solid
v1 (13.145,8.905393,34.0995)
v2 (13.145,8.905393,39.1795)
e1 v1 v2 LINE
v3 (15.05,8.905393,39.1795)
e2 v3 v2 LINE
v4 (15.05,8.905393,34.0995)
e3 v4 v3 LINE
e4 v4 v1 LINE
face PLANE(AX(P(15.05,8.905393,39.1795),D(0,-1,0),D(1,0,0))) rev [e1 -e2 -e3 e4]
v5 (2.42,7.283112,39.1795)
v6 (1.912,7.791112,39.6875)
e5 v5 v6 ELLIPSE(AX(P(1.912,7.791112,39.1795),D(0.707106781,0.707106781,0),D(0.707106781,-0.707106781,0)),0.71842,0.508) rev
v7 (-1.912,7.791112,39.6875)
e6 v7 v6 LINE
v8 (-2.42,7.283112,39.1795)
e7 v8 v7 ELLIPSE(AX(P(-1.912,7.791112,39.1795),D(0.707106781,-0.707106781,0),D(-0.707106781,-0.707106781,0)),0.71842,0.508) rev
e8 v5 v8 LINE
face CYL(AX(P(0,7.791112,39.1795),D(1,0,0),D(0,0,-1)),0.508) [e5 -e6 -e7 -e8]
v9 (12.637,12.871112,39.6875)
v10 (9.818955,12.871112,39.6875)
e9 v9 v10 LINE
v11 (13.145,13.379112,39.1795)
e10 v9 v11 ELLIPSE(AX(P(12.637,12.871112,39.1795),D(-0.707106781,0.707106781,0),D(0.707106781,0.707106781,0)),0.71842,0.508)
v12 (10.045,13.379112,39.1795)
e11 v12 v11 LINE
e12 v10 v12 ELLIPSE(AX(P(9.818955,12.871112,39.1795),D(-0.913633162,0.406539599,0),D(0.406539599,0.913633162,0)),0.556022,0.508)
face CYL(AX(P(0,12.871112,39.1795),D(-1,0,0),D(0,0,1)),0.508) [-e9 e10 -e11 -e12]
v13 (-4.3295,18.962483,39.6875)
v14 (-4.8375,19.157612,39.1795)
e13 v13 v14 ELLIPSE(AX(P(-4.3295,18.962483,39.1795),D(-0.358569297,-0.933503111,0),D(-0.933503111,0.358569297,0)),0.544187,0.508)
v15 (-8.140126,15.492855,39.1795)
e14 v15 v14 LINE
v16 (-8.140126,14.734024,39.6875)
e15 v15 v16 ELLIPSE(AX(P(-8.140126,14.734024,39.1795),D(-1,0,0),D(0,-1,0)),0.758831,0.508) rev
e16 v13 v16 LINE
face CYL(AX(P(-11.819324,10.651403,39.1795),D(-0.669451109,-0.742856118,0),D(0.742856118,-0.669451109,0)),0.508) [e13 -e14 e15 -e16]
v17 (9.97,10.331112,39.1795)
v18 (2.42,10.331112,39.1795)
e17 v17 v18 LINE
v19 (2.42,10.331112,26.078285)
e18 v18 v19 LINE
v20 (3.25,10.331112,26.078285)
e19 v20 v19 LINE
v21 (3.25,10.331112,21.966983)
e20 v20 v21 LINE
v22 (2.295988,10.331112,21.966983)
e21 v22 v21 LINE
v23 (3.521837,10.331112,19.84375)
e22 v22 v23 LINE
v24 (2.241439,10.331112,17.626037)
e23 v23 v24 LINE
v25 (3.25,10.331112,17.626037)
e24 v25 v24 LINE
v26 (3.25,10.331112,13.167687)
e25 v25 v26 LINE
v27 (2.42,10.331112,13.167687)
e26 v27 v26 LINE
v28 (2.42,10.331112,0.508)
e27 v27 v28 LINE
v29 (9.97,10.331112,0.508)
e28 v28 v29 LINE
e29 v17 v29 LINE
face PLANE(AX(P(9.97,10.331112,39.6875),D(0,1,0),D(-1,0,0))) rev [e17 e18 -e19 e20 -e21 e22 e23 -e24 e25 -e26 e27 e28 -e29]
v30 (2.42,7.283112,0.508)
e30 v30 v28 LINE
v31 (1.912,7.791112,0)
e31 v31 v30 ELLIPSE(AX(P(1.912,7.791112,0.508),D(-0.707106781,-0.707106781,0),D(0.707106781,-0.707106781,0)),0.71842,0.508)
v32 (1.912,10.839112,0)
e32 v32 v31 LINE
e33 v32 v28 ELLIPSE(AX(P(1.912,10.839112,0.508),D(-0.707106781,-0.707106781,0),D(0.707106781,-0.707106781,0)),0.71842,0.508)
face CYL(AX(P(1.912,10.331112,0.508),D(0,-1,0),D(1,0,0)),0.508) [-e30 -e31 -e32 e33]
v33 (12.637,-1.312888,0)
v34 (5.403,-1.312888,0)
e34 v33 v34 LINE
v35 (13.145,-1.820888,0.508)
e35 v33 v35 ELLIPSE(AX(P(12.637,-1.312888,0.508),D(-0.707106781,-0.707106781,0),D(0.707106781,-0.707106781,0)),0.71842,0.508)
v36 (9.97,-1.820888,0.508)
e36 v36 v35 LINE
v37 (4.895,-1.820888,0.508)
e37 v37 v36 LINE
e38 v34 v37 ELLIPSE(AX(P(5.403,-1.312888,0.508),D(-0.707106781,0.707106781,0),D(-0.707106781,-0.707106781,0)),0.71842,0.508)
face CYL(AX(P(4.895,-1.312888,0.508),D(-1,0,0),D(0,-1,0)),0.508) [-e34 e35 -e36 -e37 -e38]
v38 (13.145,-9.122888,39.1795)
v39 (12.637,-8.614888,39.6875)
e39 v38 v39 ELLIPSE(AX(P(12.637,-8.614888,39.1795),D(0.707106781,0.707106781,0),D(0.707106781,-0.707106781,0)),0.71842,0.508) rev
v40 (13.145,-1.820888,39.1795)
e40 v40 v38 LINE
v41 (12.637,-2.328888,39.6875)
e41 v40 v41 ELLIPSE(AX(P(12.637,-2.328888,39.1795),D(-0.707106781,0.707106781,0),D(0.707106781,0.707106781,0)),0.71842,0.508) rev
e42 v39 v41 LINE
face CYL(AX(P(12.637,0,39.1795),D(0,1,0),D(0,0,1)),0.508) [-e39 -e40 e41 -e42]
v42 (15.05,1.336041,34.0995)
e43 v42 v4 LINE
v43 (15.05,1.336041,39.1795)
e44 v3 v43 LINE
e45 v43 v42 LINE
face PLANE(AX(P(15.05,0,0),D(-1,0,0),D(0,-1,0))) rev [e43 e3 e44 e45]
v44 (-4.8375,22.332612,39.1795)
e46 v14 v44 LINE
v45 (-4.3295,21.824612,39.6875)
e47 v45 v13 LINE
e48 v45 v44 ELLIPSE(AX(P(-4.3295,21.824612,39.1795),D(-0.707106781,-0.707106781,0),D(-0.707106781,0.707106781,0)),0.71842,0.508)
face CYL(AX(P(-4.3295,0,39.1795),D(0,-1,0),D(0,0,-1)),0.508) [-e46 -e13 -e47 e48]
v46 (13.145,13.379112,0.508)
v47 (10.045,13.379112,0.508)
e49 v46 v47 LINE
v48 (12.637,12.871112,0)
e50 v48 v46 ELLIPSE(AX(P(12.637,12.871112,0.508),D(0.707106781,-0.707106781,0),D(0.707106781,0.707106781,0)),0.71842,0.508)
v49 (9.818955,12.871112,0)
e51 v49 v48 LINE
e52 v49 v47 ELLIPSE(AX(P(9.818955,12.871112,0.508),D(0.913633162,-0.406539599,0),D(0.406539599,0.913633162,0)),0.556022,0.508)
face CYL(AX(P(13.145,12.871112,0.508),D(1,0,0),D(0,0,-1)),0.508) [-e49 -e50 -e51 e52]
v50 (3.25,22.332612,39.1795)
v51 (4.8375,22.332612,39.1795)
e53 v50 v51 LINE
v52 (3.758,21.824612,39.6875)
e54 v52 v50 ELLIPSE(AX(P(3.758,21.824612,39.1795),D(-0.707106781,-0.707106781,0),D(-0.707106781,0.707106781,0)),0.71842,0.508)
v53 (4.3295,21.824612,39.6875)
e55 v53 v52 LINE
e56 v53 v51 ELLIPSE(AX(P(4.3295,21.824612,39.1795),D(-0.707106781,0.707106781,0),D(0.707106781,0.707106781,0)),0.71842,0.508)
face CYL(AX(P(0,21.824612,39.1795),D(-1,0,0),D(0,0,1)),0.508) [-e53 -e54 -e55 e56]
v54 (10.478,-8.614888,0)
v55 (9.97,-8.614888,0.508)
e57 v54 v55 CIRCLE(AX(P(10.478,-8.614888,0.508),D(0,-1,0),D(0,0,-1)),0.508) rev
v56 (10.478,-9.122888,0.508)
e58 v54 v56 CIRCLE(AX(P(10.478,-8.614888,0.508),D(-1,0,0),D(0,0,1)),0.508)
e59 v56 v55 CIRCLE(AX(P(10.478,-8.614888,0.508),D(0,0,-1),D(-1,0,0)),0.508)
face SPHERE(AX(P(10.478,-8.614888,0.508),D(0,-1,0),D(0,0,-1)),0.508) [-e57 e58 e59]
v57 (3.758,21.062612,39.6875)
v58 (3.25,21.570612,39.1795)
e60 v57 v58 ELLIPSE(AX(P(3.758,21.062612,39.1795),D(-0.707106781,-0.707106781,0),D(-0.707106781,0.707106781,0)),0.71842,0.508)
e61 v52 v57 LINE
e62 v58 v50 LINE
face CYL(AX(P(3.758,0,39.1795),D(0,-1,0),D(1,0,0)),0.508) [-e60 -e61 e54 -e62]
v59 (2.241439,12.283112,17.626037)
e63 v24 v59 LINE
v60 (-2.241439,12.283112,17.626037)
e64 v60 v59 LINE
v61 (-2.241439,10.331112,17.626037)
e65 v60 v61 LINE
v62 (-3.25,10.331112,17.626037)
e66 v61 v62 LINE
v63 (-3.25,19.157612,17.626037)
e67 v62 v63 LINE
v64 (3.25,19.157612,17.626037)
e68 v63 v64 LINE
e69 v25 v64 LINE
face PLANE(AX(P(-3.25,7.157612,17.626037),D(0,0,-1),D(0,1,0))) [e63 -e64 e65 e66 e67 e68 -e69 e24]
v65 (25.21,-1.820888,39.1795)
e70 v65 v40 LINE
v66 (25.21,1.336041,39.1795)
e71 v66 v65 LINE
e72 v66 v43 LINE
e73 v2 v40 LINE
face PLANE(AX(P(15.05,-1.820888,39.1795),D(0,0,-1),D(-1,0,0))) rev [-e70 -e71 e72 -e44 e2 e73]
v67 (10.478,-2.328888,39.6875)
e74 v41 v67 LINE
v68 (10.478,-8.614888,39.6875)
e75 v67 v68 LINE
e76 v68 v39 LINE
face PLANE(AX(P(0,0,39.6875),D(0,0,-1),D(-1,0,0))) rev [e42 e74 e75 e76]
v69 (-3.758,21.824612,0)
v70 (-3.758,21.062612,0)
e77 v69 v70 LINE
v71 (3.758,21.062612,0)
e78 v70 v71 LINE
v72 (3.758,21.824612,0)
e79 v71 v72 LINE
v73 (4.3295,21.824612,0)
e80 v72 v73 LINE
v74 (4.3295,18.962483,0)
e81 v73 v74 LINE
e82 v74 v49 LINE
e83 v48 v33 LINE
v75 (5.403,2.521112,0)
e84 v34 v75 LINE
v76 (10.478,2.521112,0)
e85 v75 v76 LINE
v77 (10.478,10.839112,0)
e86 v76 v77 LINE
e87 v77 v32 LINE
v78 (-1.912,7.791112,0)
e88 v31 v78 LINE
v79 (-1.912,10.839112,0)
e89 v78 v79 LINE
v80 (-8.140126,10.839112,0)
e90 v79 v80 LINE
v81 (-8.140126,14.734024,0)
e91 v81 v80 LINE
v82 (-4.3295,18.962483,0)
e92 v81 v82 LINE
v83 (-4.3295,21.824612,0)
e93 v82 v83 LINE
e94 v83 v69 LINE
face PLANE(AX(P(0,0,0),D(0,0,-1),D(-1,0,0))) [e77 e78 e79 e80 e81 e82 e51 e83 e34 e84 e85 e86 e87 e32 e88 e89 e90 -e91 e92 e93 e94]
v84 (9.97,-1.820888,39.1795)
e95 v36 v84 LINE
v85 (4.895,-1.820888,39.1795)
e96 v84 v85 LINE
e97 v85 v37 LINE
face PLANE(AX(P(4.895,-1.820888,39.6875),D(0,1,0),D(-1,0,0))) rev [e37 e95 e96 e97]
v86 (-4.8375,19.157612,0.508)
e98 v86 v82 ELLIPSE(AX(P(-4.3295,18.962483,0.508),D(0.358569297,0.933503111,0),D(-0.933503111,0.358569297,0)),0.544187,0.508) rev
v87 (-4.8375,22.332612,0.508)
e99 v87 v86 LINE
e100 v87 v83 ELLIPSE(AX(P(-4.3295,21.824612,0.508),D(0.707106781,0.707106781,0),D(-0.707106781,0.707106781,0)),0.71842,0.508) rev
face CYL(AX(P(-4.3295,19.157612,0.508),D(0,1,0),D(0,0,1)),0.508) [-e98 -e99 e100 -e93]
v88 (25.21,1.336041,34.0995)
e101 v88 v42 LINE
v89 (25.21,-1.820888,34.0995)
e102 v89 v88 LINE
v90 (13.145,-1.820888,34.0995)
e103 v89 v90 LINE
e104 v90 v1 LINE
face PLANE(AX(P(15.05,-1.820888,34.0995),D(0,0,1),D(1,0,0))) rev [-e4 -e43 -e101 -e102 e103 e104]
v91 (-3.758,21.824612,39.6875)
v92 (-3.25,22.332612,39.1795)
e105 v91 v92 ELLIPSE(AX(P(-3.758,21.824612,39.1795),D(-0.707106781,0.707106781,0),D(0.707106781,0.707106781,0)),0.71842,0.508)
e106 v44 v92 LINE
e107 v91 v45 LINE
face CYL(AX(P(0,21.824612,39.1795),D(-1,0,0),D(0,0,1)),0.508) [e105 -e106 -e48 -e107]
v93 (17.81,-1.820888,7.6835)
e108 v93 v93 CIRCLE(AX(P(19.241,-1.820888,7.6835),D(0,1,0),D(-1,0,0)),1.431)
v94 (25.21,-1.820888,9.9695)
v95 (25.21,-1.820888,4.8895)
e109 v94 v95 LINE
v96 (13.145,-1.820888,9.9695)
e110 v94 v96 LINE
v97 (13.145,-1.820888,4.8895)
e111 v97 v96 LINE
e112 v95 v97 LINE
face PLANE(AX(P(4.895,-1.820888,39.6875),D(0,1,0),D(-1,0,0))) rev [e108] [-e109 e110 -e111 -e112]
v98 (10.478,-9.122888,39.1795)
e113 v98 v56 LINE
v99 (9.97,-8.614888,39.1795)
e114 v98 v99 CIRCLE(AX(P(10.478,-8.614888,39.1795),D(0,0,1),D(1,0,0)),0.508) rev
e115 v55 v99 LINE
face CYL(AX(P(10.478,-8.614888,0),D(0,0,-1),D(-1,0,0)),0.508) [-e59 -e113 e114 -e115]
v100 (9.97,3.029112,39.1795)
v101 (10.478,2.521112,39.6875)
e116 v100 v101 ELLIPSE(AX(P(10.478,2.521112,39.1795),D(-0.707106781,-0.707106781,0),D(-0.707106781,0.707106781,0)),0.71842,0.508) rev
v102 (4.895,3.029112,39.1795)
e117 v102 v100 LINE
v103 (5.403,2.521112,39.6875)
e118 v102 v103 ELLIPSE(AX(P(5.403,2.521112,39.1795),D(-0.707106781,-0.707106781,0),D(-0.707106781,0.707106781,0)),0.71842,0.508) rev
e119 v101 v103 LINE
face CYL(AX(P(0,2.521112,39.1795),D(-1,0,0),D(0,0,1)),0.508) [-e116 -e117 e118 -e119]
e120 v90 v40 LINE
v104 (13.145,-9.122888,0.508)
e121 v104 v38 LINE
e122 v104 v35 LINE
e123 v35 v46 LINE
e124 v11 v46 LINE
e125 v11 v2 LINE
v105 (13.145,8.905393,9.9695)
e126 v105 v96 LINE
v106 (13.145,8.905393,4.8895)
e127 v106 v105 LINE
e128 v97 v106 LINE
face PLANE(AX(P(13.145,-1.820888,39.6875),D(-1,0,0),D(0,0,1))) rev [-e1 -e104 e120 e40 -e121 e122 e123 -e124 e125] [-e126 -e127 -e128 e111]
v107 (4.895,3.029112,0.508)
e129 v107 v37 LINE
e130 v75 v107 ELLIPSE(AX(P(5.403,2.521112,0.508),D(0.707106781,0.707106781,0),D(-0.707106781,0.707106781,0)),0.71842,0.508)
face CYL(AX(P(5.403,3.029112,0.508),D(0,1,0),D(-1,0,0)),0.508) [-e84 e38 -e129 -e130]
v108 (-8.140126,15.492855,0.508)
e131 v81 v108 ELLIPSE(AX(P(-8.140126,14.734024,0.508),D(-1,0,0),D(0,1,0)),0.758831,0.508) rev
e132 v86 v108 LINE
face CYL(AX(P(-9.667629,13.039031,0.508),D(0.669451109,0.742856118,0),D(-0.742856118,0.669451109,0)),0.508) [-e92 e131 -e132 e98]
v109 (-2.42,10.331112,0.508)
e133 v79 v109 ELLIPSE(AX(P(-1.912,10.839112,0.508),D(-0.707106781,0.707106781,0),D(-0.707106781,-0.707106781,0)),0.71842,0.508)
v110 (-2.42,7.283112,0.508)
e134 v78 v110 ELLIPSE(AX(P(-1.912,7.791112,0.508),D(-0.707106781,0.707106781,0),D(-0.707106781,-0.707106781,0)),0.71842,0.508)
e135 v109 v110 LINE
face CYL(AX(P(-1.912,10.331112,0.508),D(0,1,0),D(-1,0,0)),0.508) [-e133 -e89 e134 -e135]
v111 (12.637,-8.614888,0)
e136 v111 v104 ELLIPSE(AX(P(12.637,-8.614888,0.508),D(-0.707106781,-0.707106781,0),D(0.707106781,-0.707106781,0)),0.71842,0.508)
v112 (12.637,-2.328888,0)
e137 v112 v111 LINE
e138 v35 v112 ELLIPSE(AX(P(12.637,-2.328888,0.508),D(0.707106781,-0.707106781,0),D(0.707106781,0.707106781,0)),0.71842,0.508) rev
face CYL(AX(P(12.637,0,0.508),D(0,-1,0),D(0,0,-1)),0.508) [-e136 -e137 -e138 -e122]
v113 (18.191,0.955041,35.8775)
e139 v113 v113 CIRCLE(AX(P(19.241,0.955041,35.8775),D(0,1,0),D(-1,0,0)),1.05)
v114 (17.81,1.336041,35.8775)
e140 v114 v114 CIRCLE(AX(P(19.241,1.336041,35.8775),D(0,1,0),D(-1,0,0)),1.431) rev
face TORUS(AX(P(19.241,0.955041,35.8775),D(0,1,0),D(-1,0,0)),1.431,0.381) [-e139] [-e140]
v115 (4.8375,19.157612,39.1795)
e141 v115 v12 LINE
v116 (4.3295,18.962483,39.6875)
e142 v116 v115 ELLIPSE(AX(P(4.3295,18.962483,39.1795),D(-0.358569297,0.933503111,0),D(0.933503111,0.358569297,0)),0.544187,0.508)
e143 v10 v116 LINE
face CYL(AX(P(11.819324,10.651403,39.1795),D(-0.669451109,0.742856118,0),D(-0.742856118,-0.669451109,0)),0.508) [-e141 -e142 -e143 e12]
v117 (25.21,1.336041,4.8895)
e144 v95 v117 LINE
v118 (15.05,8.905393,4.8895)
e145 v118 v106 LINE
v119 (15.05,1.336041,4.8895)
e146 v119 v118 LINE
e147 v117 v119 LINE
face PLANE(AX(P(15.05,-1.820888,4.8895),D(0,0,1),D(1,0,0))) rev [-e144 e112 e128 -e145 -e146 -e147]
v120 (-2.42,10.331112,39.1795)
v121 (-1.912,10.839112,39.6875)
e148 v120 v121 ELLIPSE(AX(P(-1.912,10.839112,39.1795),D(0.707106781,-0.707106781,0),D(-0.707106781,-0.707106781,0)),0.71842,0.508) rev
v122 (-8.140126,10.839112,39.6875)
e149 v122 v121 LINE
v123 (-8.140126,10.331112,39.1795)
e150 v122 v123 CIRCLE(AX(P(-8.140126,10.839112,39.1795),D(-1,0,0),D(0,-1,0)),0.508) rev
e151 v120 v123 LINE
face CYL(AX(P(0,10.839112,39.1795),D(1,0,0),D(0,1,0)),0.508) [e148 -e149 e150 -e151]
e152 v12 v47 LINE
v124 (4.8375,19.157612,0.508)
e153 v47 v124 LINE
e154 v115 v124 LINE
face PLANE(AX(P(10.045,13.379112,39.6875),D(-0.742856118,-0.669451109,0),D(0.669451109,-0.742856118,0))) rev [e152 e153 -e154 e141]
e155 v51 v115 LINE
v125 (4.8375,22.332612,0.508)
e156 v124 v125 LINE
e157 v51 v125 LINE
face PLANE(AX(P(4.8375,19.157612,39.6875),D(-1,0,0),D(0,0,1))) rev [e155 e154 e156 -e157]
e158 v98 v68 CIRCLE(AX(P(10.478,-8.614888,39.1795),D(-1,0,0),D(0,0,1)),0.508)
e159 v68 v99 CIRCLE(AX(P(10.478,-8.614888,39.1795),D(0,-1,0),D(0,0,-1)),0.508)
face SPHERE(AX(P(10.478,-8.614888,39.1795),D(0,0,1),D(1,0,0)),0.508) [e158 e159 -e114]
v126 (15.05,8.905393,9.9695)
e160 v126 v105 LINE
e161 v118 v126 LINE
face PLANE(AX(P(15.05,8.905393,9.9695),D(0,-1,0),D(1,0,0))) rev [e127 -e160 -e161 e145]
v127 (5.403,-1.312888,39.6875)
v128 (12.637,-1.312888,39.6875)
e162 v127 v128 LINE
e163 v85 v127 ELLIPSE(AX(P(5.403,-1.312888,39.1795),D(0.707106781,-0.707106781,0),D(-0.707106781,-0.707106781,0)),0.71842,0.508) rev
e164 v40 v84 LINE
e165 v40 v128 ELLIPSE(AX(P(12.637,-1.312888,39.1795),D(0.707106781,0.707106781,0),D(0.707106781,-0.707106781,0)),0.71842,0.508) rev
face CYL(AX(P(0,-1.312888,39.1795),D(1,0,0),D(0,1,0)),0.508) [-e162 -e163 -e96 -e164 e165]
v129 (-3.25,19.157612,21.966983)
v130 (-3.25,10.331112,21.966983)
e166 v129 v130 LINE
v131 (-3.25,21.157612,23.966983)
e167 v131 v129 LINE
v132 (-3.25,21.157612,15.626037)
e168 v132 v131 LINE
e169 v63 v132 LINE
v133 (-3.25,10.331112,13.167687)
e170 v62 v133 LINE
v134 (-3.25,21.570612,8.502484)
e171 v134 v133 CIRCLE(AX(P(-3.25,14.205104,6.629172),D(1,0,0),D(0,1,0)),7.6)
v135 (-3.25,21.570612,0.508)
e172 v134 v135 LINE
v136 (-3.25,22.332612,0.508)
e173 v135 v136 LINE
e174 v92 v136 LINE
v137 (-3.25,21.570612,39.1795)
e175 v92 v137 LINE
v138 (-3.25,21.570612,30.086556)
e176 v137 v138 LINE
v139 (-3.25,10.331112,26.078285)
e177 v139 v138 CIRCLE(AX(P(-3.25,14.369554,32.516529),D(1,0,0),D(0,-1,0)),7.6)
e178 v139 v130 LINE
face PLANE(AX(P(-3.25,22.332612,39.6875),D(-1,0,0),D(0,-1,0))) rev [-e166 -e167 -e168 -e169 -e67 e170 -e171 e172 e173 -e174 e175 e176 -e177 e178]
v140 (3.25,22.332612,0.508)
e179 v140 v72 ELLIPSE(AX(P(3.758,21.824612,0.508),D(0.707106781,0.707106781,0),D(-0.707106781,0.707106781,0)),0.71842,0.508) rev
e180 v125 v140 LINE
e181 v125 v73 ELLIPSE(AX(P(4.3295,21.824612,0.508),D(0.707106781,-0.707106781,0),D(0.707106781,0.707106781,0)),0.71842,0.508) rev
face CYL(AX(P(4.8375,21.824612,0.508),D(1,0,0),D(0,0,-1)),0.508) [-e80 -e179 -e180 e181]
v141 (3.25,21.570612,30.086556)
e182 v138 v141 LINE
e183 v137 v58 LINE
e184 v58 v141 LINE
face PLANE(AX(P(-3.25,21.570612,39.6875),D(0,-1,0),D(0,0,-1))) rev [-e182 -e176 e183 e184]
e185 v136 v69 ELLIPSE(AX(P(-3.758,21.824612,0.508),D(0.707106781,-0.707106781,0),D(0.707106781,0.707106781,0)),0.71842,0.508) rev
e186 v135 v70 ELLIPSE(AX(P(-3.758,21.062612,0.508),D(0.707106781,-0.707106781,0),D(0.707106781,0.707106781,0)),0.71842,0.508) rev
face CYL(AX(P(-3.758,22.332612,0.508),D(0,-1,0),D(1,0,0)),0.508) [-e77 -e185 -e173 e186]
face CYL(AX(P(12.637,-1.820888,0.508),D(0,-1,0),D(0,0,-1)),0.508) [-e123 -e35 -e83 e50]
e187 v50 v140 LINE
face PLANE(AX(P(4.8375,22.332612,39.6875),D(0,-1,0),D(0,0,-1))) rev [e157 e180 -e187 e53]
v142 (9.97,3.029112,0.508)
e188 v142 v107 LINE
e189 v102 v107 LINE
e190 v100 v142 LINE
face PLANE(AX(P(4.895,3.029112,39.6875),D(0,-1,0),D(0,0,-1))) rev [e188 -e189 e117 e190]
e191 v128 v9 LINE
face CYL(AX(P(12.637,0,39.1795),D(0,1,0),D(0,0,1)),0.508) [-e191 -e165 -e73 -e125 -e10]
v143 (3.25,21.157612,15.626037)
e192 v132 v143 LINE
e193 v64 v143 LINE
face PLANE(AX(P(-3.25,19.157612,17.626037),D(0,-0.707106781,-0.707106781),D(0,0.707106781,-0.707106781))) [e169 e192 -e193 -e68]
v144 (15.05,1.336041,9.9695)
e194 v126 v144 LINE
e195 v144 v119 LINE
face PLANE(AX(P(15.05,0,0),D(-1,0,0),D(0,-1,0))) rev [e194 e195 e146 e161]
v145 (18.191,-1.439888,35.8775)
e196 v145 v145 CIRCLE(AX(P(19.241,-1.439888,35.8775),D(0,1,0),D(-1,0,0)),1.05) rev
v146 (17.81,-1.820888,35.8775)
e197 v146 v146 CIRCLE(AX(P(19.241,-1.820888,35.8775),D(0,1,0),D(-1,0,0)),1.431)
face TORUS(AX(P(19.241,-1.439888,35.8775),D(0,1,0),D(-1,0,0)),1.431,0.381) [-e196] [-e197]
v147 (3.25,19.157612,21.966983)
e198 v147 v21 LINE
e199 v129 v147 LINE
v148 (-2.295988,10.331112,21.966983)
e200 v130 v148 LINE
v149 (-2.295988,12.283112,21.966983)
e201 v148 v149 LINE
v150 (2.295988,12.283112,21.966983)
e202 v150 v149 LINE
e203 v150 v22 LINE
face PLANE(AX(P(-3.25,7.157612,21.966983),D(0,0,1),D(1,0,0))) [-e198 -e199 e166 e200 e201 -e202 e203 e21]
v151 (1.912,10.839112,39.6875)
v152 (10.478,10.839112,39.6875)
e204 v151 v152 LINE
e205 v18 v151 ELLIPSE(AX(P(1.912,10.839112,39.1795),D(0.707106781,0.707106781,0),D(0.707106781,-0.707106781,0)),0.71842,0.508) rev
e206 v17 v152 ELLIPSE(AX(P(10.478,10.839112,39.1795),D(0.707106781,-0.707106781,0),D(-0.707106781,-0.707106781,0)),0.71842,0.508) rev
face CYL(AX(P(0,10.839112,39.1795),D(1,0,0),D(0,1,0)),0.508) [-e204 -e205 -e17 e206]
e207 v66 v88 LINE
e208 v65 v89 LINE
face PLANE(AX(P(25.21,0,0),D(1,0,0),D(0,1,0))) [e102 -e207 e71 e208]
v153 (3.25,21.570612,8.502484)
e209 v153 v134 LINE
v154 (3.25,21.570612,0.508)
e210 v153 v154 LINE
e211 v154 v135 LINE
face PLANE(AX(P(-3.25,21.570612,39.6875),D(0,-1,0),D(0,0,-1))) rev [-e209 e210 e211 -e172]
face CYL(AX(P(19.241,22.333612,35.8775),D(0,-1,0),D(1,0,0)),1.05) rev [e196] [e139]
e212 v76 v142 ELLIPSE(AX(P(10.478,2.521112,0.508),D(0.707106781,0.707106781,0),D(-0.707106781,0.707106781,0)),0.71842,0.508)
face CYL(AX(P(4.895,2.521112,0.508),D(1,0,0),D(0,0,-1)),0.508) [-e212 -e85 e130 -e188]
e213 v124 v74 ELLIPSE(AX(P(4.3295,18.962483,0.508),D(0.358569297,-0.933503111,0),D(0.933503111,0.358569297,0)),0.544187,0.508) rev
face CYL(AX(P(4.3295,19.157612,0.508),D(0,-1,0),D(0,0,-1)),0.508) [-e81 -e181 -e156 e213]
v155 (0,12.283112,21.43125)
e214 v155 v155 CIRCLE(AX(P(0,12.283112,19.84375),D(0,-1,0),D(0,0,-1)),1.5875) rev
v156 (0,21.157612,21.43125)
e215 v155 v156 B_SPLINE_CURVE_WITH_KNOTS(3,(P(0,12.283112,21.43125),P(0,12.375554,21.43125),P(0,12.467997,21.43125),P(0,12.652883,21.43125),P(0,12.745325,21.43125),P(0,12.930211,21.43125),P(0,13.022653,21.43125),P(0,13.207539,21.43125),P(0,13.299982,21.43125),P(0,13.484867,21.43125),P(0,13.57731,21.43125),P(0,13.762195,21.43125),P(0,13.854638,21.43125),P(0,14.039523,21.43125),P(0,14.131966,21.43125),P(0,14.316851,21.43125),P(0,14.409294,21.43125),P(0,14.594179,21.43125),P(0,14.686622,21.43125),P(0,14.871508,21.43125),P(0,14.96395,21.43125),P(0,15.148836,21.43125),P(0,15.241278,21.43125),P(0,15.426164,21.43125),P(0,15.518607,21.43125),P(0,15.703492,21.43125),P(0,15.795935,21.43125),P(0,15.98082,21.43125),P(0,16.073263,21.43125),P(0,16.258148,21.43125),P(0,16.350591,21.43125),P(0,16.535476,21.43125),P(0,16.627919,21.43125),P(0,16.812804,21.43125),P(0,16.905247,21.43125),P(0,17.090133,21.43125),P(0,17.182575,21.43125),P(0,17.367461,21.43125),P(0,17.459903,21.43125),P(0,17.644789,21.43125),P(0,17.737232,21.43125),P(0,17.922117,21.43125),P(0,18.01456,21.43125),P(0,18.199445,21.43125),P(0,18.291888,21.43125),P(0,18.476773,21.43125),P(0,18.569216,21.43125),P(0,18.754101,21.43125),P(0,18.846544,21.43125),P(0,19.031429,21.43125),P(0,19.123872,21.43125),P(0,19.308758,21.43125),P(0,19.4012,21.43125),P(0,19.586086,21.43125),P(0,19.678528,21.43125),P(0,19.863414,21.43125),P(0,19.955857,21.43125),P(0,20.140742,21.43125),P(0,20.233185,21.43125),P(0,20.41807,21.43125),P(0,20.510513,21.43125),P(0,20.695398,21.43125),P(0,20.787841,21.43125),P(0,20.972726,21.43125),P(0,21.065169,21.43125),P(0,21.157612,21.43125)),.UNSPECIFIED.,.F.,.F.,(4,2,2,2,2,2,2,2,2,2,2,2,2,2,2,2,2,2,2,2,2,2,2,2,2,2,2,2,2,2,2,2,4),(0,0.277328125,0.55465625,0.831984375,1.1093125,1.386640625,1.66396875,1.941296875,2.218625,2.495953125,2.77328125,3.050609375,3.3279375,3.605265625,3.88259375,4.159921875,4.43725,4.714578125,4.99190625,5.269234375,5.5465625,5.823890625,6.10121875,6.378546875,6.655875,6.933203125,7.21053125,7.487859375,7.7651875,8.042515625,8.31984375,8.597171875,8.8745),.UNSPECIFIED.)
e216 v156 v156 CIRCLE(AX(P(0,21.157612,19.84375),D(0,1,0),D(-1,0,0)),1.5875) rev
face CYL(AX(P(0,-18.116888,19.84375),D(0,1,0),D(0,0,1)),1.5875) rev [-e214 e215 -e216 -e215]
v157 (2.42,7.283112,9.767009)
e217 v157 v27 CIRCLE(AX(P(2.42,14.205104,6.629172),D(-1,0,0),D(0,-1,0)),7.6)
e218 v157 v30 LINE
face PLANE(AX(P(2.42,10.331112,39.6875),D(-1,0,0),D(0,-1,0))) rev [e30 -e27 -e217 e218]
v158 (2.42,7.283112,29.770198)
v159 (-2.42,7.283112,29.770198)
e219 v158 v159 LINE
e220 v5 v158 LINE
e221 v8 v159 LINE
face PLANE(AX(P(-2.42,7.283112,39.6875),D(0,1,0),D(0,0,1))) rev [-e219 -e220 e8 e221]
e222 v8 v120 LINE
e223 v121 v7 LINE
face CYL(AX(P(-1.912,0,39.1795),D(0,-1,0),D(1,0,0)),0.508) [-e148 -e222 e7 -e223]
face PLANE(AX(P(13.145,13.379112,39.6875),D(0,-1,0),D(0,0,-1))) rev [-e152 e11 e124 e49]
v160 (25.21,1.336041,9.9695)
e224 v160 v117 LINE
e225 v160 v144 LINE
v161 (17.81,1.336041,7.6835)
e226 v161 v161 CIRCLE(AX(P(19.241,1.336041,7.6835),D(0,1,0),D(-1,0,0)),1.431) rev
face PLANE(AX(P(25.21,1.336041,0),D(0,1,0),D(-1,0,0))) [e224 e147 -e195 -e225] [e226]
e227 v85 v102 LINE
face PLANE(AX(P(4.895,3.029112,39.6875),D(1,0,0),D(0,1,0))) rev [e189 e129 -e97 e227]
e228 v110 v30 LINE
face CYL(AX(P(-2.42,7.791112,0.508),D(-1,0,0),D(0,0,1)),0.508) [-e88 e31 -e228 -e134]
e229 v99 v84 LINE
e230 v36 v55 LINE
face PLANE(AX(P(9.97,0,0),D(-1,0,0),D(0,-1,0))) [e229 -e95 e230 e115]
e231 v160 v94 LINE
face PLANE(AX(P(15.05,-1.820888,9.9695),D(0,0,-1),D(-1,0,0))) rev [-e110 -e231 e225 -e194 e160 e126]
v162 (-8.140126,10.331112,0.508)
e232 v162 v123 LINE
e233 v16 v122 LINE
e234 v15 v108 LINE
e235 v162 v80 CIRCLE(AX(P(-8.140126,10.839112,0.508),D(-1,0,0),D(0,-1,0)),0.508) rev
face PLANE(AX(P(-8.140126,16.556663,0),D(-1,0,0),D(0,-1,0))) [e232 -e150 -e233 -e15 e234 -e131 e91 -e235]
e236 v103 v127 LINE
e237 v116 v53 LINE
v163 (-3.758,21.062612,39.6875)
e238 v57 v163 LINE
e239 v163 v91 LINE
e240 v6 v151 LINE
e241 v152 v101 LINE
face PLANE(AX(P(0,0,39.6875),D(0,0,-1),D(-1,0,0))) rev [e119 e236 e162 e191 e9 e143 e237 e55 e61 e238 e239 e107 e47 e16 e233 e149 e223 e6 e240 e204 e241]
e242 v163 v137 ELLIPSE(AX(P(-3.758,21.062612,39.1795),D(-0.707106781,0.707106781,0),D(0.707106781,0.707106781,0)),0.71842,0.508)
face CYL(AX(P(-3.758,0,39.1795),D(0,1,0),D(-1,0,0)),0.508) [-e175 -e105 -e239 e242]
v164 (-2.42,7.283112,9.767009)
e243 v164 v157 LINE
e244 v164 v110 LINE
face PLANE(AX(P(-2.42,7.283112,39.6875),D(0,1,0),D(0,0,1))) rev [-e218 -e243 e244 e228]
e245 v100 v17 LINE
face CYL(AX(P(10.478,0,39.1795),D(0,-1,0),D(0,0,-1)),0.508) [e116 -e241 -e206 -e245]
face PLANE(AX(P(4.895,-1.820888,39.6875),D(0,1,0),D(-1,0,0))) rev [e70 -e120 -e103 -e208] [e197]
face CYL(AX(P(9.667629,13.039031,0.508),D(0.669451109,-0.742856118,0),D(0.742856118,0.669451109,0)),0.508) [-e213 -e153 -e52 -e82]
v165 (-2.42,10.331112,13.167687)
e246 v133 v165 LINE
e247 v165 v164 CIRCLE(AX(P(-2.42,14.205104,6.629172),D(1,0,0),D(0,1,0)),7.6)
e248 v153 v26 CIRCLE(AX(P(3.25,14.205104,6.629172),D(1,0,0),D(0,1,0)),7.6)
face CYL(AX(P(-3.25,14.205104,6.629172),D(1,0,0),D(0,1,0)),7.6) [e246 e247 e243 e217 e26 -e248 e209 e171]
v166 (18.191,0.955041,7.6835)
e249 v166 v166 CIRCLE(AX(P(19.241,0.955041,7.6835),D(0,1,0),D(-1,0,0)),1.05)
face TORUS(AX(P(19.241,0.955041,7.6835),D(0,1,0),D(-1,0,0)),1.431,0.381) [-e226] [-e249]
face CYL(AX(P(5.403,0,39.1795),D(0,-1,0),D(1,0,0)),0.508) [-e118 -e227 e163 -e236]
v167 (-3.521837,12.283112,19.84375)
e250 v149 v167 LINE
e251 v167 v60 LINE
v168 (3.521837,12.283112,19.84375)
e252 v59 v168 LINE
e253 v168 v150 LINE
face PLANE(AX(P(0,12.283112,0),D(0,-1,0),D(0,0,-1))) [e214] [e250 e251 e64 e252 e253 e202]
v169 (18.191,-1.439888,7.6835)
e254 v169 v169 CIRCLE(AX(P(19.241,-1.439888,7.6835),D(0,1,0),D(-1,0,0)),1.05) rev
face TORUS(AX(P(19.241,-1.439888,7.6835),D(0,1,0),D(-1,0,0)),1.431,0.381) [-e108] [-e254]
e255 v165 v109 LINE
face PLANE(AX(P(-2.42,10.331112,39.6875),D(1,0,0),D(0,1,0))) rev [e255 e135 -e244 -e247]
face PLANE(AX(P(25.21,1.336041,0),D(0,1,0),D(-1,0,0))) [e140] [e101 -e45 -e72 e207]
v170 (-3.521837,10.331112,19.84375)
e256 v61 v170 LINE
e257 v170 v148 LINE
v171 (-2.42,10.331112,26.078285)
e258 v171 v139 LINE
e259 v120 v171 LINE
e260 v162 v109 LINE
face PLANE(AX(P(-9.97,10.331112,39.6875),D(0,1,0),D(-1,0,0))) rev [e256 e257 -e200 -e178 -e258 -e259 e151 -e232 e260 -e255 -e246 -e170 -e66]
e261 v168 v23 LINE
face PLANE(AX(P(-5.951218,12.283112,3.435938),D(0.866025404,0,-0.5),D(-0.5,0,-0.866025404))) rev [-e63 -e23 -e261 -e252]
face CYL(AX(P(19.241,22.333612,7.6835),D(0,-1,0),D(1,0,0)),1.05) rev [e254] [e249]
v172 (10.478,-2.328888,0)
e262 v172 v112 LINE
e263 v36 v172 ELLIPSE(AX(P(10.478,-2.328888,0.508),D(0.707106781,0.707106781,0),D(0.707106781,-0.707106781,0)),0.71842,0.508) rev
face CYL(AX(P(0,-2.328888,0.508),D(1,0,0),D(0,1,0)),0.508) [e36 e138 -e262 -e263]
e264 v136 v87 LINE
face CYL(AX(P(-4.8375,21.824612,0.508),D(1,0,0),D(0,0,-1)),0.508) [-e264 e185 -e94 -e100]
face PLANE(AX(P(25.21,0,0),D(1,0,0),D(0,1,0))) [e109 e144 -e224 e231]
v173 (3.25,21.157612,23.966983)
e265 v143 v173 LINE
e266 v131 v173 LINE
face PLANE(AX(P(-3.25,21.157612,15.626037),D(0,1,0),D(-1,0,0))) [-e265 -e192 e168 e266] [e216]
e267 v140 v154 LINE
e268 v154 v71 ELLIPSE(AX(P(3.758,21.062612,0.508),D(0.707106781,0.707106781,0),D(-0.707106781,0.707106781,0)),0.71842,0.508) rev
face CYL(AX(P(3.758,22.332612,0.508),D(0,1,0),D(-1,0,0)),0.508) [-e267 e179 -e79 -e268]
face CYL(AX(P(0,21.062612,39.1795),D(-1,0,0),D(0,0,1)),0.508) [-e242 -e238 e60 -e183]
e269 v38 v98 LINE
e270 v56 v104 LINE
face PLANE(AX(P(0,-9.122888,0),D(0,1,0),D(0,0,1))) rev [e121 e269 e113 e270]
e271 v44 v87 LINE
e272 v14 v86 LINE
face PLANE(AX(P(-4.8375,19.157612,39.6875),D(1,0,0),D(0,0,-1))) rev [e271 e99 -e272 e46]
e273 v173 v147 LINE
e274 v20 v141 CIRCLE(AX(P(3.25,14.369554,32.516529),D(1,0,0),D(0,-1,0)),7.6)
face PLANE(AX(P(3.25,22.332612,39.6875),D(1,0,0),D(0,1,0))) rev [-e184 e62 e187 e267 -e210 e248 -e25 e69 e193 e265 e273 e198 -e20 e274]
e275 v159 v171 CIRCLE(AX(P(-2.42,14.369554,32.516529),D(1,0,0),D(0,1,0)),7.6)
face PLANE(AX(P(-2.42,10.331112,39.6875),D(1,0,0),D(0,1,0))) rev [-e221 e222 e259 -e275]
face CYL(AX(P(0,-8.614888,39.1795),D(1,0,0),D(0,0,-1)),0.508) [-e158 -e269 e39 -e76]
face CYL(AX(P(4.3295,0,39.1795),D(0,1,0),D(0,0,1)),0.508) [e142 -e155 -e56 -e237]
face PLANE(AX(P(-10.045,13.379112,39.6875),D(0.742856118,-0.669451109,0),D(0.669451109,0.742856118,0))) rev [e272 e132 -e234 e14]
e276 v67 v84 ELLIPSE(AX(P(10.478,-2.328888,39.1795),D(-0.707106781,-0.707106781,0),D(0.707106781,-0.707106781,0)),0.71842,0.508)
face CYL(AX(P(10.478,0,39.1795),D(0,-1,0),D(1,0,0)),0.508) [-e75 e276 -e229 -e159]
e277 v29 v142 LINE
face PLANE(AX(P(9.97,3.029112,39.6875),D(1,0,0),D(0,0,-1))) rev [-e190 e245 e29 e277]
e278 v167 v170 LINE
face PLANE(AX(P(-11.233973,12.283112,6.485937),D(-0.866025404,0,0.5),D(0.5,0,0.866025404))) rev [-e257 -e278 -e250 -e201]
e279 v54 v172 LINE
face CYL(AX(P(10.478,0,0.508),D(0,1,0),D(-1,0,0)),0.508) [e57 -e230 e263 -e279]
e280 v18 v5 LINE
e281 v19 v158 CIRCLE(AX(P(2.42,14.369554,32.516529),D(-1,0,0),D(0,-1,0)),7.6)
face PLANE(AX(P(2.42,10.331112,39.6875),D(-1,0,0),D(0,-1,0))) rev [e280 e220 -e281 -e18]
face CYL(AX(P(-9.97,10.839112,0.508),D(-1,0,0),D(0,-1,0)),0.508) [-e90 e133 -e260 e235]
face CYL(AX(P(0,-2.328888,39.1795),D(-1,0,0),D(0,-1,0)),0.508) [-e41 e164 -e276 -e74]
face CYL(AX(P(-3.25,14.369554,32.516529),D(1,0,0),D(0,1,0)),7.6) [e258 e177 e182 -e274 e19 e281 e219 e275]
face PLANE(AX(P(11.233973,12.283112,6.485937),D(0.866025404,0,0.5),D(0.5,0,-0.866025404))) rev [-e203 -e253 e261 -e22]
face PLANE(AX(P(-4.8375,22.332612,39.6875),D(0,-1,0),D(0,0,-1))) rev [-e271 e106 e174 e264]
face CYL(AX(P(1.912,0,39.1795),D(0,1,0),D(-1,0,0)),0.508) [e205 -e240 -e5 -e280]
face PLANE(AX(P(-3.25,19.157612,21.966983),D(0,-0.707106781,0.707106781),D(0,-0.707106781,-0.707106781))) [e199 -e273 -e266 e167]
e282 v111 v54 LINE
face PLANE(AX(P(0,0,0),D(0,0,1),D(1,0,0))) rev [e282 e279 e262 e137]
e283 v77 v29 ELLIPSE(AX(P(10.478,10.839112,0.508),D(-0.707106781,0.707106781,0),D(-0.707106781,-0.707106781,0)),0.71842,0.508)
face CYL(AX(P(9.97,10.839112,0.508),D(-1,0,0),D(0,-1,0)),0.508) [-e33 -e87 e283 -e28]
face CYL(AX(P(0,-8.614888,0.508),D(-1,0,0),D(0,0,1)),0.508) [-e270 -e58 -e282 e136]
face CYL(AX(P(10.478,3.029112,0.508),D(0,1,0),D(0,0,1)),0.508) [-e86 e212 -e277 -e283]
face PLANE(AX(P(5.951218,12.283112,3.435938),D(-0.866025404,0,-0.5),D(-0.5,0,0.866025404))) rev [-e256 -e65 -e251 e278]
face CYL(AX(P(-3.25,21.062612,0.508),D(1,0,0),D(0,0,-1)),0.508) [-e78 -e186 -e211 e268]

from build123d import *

# Parameters (mm, degrees)
BOSS_EXTRUDE1_DEPTH      = 39.6875
SKETCH3_R                = 1.5875
CUT_EXTRUDE1_DEPTH       = 39.6875
CUT_EXTRUDE3_DEPTH       = 5
CUT_EXTRUDE5_DEPTH       = 0.83
CUT_EXTRUDE5_DEPTH_BACK  = 5.67
FILLET1_R                = 0.508
SKETCH7_W                = 5.08
SKETCH7_H                = 10.72628101
BOSS_EXTRUDE2_DEPTH      = 1.905
SKETCH8_W                = 5.08
SKETCH8_H                = 3.15692897
BOSS_EXTRUDE3_DEPTH      = 10.16
CUT_EXTRUDE7_REACH       = 54.859
SKETCH9_R                = 1.05
FILLET2_R                = 0.381
CUT_EXTRUDE8_DEPTH       = 53.05177524
BOSS_EXTRUDE4_DEPTH      = 0.508
BOSS_EXTRUDE4_DEPTH_BACK = 39.1795
SKETCH11_W               = 3.175
SKETCH11_H               = 7.302
SKETCH11_W_2             = 4.84
SKETCH11_H_2             = 6.1
SKETCH11_W_3             = 5.720125627
SKETCH11_H_3             = 3.05
FILLET3_R                = 0.508
SKETCH13_W               = 4.84
SKETCH13_H               = 4.34094633
CUT_EXTRUDE10_DEPTH      = 3.048


with BuildPart() as part:
    # Sketch2 → Boss-Extrude1 (new body)
    with BuildSketch(Plane.XY):
        Polygon((-4.895, 3.02911179), (-9.97, 3.02911179), (-9.97, 10.33111179), (-2.42, 10.33111179), (-2.42, 7.28311179), (2.42, 7.28311179), (2.42, 10.33111179), (9.97, 10.33111179), (9.97, 3.02911179), (4.895, 3.02911179), (4.895, -1.82088821), (13.145, -1.82088821), (13.145, 13.37911179), (10.045, 13.37911179), (4.8375, 19.15761179), (4.8375, 22.33261179), (3.25, 22.33261179), (3.25, 21.57061179), (-3.25, 21.57061179), (-3.25, 22.33261179), (-4.8375, 22.33261179), (-4.8375, 19.15761179), (-10.045, 13.37911179), (-13.145, 13.37911179), (-13.145, -1.82088821), (-4.895, -1.82088821), align=None)
    extrude(amount=BOSS_EXTRUDE1_DEPTH)

    # Sketch3 → Cut-Extrude1 (cut)
    with BuildSketch(Plane(origin=(0, 21.57061179, 0), x_dir=(1, 0, 0), z_dir=(0, 1, 0))):
        with Locations(Location((0, -19.84375, 0), (0, 0, 270))):
            Circle(SKETCH3_R)
    extrude(amount=-CUT_EXTRUDE1_DEPTH, mode=Mode.SUBTRACT)

    # Sketch4 → Cut-Extrude3 (cut)
    with BuildSketch(Plane.XZ.offset(-7.28311179)):
        Polygon((1.760918321, 16.79375), (3.521836642, 19.84375), (1.760918321, 22.89375), (-1.760918321, 22.89375), (-3.521836642, 19.84375), (-1.760918321, 16.79375), align=None)
    extrude(amount=-CUT_EXTRUDE3_DEPTH, mode=Mode.SUBTRACT)

    # Sketch5 → Cut-Extrude5 (cut, two sides: drawn at the far end of the back side and taken through both)
    with BuildSketch(Plane.ZY.offset(2.42).offset(-CUT_EXTRUDE5_DEPTH_BACK)):
        with BuildLine():
            Line((21.966982917, 7.15761179), (21.966982917, 19.15761179))
            Line((21.966982917, 19.15761179), (23.966982917, 21.15761179))
            Line((23.966982917, 21.15761179), (15.626036587, 21.15761179))
            Line((15.626036587, 21.15761179), (17.626036587, 19.15761179))
            Line((17.626036587, 19.15761179), (17.626036587, 7.15761179))
            Line((17.626036587, 7.15761179), (9.473965766, 7.15761179))
            ThreePointArc((9.473965766, 7.15761179), (14.101249798, 15.593648004), (6.752192324, 21.804108435))
            Line((6.752192324, 21.804108435), (30.939378373, 21.804108435))
            ThreePointArc((30.939378373, 21.804108435), (24.928421122, 14.794550832), (30.119053738, 7.15761179))
            Line((30.119053738, 7.15761179), (21.966982917, 7.15761179))
        make_face()
    extrude(amount=CUT_EXTRUDE5_DEPTH + CUT_EXTRUDE5_DEPTH_BACK, mode=Mode.SUBTRACT)

    # Fillet1
    fillet1_edges = [part.edges().sort_by_distance(p)[0] for p in [
        (-13.145, 5.77911179, 39.6875),
        (-9.02, -1.82088821, 39.6875),
        (-9.97, 6.68011179, 39.6875),
        (-6.195, 10.33111179, 39.6875),
        (-2.42, 8.80711179, 39.6875),
        (-9.02, -1.82088821, 0),
        (0, 7.28311179, 39.6875),
        (-13.145, 5.77911179, 0),
        (-11.595, 13.37911179, 0),
        (-7.44125, 16.26836179, 0),
        (-4.8375, 20.74511179, 0),
        (-4.04375, 22.33261179, 0),
        (-3.25, 21.95161179, 0),
        (0, 21.57061179, 0),
        (3.25, 21.95161179, 0),
        (4.04375, 22.33261179, 0),
        (4.8375, 20.74511179, 0),
        (2.42, 8.80711179, 39.6875),
        (7.44125, 16.26836179, 0),
        (11.595, 13.37911179, 0),
        (13.145, 5.77911179, 0),
        (9.02, -1.82088821, 0),
        (4.895, 0.60411179, 0),
        (7.4325, 3.02911179, 0),
        (9.97, 6.68011179, 0),
        (6.195, 10.33111179, 0),
        (2.42, 8.80711179, 0),
        (0, 7.28311179, 0),
        (6.195, 10.33111179, 39.6875),
        (-2.42, 8.80711179, 0),
        (-6.195, 10.33111179, 0),
        (-9.97, 6.68011179, 0),
        (-7.4325, 3.02911179, 0),
        (-4.895, 0.60411179, 0),
        (9.97, 6.68011179, 39.6875),
        (7.4325, 3.02911179, 39.6875),
        (4.895, 0.60411179, 39.6875),
        (9.02, -1.82088821, 39.6875),
        (-4.895, 0.60411179, 39.6875),
        (13.145, 5.77911179, 39.6875),
        (11.595, 13.37911179, 39.6875),
        (7.44125, 16.26836179, 39.6875),
        (4.8375, 20.74511179, 39.6875),
        (4.04375, 22.33261179, 39.6875),
        (3.25, 21.95161179, 39.6875),
        (0, 21.57061179, 39.6875),
        (-3.25, 21.95161179, 39.6875),
        (-4.04375, 22.33261179, 39.6875),
        (-4.8375, 20.74511179, 39.6875),
        (-7.4325, 3.02911179, 39.6875),
        (-7.44125, 16.26836179, 39.6875),
        (-11.595, 13.37911179, 39.6875),
    ]]
    fillet(fillet1_edges, radius=FILLET1_R)

    # Sketch7 → Boss-Extrude2 (add)
    with BuildSketch(Plane(origin=(13.145, 0, 0), x_dir=(0, 0, -1), z_dir=(1, 0, 0))):
        with Locations((-36.6395, 3.542252295)):
            Rectangle(SKETCH7_W, SKETCH7_H)
        with Locations((-7.4295, 3.542252295)):
            Rectangle(SKETCH7_W, SKETCH7_H)
    extrude(amount=BOSS_EXTRUDE2_DEPTH)

    # Sketch8 → Boss-Extrude3 (add)
    with BuildSketch(Plane(origin=(15.05, 0, 0), x_dir=(0, 0, -1), z_dir=(1, 0, 0))):
        with Locations((-36.6395, -0.242423725)):
            Rectangle(SKETCH8_W, SKETCH8_H)
        with Locations((-7.4295, -0.242423725)):
            Rectangle(SKETCH8_W, SKETCH8_H)
    extrude(amount=BOSS_EXTRUDE3_DEPTH)

    # Sketch9 → Cut-Extrude7 (cut, up to next)
    with BuildSketch(Plane.XZ.offset(1.82088821), mode=Mode.PRIVATE) as cut_extrude7_sk1:
        with Locations((19.241, 35.8775)):
            Circle(SKETCH9_R)
    cut_extrude7_tool1 = extrude(cut_extrude7_sk1.sketch, amount=-CUT_EXTRUDE7_REACH, mode=Mode.PRIVATE) & part.part
    # Sketch9 → Cut-Extrude7 (cut, up to next)
    with BuildSketch(Plane.XZ.offset(1.82088821), mode=Mode.PRIVATE) as cut_extrude7_sk2:
        with Locations((19.241, 7.6835)):
            Circle(SKETCH9_R)
    cut_extrude7_tool2 = extrude(cut_extrude7_sk2.sketch, amount=-CUT_EXTRUDE7_REACH, mode=Mode.PRIVATE) & part.part
    add(cut_extrude7_tool1.solids().sort_by_distance((19.241, -1.820888, 35.8775))[0], mode=Mode.SUBTRACT)
    add(cut_extrude7_tool2.solids().sort_by_distance((19.241, -1.820888, 7.6835))[0], mode=Mode.SUBTRACT)

    # Fillet2
    fillet2_edges = [part.edges().sort_by_distance(p)[0] for p in [
        (18.191, 1.33604076, 35.8775),
        (18.191, -1.82088821, 35.8775),
        (18.191, 1.33604076, 7.6835),
        (18.191, -1.82088821, 7.6835),
    ]]
    fillet(fillet2_edges, radius=FILLET2_R)

    # Sketch10 → Cut-Extrude8 (cut, through all)
    with BuildSketch(Plane.XY.offset(39.6875)):
        Polygon((-8.140125627, 16.556662615), (-13.795, 16.556662615), (-15.501836838, 16.556662615), (-15.501836838, 5.924292452), (-8.140125627, 5.924292452), align=None)
        Polygon((-4.124785379, 5.924292452), (-8.140125627, 5.924292452), (-15.501836838, 5.924292452), (-15.501836838, -4.367210951), (-4.124785379, -4.367210951), align=None)
    extrude(amount=-CUT_EXTRUDE8_DEPTH, mode=Mode.SUBTRACT)

    # Sketch11 → Boss-Extrude4 (add, two sides: drawn at the far end of the back side and taken through both)
    with BuildSketch(Plane.XY.offset(39.1795).offset(-BOSS_EXTRUDE4_DEPTH_BACK)):
        with Locations((11.5575, -5.47188821)):
            Rectangle(SKETCH11_W, SKETCH11_H)
        with Locations((0, -9.12288821)):
            Rectangle(SKETCH11_W_2, SKETCH11_H_2)
        with Locations((-5.280062813, -10.64788821)):
            Rectangle(SKETCH11_W_3, SKETCH11_H_3)
    extrude(amount=BOSS_EXTRUDE4_DEPTH + BOSS_EXTRUDE4_DEPTH_BACK)


with BuildPart() as boss_extrude4_kept_piece:
    # of the separate pieces the step leaves, the one the design keeps (boss_extrude4_pieces_kept)
    add(part.part.solids().sort_by_distance((4.895, -1.82088821, 0.508))[0])

    # Fillet3
    fillet3_edges = [boss_extrude4_kept_piece.edges().sort_by_distance(p)[0] for p in [
        (11.5575, -9.12288821, 39.6875),
        (9.97, -9.12288821, 19.84375),
        (11.5575, -9.12288821, 0),
        (9.97, -5.47188821, 0),
        (13.145, -5.47188821, 0),
        (13.145, -5.47188821, 39.6875),
        (9.97, -5.47188821, 39.6875),
        (11.5575, -1.82088821, 39.6875),
        (11.5575, -1.82088821, 0),
    ]]
    fillet(fillet3_edges, radius=FILLET3_R - 0.0001)  # a hair under: the kernel refuses the full size

    # Sketch13 → Cut-Extrude10 (cut)
    with BuildSketch(Plane.XZ.offset(-7.28311179)):
        with Locations((0, 19.796509752)):
            Rectangle(SKETCH13_W, SKETCH13_H)
    extrude(amount=-CUT_EXTRUDE10_DEPTH, mode=Mode.SUBTRACT)


solid = boss_extrude4_kept_piece.part
